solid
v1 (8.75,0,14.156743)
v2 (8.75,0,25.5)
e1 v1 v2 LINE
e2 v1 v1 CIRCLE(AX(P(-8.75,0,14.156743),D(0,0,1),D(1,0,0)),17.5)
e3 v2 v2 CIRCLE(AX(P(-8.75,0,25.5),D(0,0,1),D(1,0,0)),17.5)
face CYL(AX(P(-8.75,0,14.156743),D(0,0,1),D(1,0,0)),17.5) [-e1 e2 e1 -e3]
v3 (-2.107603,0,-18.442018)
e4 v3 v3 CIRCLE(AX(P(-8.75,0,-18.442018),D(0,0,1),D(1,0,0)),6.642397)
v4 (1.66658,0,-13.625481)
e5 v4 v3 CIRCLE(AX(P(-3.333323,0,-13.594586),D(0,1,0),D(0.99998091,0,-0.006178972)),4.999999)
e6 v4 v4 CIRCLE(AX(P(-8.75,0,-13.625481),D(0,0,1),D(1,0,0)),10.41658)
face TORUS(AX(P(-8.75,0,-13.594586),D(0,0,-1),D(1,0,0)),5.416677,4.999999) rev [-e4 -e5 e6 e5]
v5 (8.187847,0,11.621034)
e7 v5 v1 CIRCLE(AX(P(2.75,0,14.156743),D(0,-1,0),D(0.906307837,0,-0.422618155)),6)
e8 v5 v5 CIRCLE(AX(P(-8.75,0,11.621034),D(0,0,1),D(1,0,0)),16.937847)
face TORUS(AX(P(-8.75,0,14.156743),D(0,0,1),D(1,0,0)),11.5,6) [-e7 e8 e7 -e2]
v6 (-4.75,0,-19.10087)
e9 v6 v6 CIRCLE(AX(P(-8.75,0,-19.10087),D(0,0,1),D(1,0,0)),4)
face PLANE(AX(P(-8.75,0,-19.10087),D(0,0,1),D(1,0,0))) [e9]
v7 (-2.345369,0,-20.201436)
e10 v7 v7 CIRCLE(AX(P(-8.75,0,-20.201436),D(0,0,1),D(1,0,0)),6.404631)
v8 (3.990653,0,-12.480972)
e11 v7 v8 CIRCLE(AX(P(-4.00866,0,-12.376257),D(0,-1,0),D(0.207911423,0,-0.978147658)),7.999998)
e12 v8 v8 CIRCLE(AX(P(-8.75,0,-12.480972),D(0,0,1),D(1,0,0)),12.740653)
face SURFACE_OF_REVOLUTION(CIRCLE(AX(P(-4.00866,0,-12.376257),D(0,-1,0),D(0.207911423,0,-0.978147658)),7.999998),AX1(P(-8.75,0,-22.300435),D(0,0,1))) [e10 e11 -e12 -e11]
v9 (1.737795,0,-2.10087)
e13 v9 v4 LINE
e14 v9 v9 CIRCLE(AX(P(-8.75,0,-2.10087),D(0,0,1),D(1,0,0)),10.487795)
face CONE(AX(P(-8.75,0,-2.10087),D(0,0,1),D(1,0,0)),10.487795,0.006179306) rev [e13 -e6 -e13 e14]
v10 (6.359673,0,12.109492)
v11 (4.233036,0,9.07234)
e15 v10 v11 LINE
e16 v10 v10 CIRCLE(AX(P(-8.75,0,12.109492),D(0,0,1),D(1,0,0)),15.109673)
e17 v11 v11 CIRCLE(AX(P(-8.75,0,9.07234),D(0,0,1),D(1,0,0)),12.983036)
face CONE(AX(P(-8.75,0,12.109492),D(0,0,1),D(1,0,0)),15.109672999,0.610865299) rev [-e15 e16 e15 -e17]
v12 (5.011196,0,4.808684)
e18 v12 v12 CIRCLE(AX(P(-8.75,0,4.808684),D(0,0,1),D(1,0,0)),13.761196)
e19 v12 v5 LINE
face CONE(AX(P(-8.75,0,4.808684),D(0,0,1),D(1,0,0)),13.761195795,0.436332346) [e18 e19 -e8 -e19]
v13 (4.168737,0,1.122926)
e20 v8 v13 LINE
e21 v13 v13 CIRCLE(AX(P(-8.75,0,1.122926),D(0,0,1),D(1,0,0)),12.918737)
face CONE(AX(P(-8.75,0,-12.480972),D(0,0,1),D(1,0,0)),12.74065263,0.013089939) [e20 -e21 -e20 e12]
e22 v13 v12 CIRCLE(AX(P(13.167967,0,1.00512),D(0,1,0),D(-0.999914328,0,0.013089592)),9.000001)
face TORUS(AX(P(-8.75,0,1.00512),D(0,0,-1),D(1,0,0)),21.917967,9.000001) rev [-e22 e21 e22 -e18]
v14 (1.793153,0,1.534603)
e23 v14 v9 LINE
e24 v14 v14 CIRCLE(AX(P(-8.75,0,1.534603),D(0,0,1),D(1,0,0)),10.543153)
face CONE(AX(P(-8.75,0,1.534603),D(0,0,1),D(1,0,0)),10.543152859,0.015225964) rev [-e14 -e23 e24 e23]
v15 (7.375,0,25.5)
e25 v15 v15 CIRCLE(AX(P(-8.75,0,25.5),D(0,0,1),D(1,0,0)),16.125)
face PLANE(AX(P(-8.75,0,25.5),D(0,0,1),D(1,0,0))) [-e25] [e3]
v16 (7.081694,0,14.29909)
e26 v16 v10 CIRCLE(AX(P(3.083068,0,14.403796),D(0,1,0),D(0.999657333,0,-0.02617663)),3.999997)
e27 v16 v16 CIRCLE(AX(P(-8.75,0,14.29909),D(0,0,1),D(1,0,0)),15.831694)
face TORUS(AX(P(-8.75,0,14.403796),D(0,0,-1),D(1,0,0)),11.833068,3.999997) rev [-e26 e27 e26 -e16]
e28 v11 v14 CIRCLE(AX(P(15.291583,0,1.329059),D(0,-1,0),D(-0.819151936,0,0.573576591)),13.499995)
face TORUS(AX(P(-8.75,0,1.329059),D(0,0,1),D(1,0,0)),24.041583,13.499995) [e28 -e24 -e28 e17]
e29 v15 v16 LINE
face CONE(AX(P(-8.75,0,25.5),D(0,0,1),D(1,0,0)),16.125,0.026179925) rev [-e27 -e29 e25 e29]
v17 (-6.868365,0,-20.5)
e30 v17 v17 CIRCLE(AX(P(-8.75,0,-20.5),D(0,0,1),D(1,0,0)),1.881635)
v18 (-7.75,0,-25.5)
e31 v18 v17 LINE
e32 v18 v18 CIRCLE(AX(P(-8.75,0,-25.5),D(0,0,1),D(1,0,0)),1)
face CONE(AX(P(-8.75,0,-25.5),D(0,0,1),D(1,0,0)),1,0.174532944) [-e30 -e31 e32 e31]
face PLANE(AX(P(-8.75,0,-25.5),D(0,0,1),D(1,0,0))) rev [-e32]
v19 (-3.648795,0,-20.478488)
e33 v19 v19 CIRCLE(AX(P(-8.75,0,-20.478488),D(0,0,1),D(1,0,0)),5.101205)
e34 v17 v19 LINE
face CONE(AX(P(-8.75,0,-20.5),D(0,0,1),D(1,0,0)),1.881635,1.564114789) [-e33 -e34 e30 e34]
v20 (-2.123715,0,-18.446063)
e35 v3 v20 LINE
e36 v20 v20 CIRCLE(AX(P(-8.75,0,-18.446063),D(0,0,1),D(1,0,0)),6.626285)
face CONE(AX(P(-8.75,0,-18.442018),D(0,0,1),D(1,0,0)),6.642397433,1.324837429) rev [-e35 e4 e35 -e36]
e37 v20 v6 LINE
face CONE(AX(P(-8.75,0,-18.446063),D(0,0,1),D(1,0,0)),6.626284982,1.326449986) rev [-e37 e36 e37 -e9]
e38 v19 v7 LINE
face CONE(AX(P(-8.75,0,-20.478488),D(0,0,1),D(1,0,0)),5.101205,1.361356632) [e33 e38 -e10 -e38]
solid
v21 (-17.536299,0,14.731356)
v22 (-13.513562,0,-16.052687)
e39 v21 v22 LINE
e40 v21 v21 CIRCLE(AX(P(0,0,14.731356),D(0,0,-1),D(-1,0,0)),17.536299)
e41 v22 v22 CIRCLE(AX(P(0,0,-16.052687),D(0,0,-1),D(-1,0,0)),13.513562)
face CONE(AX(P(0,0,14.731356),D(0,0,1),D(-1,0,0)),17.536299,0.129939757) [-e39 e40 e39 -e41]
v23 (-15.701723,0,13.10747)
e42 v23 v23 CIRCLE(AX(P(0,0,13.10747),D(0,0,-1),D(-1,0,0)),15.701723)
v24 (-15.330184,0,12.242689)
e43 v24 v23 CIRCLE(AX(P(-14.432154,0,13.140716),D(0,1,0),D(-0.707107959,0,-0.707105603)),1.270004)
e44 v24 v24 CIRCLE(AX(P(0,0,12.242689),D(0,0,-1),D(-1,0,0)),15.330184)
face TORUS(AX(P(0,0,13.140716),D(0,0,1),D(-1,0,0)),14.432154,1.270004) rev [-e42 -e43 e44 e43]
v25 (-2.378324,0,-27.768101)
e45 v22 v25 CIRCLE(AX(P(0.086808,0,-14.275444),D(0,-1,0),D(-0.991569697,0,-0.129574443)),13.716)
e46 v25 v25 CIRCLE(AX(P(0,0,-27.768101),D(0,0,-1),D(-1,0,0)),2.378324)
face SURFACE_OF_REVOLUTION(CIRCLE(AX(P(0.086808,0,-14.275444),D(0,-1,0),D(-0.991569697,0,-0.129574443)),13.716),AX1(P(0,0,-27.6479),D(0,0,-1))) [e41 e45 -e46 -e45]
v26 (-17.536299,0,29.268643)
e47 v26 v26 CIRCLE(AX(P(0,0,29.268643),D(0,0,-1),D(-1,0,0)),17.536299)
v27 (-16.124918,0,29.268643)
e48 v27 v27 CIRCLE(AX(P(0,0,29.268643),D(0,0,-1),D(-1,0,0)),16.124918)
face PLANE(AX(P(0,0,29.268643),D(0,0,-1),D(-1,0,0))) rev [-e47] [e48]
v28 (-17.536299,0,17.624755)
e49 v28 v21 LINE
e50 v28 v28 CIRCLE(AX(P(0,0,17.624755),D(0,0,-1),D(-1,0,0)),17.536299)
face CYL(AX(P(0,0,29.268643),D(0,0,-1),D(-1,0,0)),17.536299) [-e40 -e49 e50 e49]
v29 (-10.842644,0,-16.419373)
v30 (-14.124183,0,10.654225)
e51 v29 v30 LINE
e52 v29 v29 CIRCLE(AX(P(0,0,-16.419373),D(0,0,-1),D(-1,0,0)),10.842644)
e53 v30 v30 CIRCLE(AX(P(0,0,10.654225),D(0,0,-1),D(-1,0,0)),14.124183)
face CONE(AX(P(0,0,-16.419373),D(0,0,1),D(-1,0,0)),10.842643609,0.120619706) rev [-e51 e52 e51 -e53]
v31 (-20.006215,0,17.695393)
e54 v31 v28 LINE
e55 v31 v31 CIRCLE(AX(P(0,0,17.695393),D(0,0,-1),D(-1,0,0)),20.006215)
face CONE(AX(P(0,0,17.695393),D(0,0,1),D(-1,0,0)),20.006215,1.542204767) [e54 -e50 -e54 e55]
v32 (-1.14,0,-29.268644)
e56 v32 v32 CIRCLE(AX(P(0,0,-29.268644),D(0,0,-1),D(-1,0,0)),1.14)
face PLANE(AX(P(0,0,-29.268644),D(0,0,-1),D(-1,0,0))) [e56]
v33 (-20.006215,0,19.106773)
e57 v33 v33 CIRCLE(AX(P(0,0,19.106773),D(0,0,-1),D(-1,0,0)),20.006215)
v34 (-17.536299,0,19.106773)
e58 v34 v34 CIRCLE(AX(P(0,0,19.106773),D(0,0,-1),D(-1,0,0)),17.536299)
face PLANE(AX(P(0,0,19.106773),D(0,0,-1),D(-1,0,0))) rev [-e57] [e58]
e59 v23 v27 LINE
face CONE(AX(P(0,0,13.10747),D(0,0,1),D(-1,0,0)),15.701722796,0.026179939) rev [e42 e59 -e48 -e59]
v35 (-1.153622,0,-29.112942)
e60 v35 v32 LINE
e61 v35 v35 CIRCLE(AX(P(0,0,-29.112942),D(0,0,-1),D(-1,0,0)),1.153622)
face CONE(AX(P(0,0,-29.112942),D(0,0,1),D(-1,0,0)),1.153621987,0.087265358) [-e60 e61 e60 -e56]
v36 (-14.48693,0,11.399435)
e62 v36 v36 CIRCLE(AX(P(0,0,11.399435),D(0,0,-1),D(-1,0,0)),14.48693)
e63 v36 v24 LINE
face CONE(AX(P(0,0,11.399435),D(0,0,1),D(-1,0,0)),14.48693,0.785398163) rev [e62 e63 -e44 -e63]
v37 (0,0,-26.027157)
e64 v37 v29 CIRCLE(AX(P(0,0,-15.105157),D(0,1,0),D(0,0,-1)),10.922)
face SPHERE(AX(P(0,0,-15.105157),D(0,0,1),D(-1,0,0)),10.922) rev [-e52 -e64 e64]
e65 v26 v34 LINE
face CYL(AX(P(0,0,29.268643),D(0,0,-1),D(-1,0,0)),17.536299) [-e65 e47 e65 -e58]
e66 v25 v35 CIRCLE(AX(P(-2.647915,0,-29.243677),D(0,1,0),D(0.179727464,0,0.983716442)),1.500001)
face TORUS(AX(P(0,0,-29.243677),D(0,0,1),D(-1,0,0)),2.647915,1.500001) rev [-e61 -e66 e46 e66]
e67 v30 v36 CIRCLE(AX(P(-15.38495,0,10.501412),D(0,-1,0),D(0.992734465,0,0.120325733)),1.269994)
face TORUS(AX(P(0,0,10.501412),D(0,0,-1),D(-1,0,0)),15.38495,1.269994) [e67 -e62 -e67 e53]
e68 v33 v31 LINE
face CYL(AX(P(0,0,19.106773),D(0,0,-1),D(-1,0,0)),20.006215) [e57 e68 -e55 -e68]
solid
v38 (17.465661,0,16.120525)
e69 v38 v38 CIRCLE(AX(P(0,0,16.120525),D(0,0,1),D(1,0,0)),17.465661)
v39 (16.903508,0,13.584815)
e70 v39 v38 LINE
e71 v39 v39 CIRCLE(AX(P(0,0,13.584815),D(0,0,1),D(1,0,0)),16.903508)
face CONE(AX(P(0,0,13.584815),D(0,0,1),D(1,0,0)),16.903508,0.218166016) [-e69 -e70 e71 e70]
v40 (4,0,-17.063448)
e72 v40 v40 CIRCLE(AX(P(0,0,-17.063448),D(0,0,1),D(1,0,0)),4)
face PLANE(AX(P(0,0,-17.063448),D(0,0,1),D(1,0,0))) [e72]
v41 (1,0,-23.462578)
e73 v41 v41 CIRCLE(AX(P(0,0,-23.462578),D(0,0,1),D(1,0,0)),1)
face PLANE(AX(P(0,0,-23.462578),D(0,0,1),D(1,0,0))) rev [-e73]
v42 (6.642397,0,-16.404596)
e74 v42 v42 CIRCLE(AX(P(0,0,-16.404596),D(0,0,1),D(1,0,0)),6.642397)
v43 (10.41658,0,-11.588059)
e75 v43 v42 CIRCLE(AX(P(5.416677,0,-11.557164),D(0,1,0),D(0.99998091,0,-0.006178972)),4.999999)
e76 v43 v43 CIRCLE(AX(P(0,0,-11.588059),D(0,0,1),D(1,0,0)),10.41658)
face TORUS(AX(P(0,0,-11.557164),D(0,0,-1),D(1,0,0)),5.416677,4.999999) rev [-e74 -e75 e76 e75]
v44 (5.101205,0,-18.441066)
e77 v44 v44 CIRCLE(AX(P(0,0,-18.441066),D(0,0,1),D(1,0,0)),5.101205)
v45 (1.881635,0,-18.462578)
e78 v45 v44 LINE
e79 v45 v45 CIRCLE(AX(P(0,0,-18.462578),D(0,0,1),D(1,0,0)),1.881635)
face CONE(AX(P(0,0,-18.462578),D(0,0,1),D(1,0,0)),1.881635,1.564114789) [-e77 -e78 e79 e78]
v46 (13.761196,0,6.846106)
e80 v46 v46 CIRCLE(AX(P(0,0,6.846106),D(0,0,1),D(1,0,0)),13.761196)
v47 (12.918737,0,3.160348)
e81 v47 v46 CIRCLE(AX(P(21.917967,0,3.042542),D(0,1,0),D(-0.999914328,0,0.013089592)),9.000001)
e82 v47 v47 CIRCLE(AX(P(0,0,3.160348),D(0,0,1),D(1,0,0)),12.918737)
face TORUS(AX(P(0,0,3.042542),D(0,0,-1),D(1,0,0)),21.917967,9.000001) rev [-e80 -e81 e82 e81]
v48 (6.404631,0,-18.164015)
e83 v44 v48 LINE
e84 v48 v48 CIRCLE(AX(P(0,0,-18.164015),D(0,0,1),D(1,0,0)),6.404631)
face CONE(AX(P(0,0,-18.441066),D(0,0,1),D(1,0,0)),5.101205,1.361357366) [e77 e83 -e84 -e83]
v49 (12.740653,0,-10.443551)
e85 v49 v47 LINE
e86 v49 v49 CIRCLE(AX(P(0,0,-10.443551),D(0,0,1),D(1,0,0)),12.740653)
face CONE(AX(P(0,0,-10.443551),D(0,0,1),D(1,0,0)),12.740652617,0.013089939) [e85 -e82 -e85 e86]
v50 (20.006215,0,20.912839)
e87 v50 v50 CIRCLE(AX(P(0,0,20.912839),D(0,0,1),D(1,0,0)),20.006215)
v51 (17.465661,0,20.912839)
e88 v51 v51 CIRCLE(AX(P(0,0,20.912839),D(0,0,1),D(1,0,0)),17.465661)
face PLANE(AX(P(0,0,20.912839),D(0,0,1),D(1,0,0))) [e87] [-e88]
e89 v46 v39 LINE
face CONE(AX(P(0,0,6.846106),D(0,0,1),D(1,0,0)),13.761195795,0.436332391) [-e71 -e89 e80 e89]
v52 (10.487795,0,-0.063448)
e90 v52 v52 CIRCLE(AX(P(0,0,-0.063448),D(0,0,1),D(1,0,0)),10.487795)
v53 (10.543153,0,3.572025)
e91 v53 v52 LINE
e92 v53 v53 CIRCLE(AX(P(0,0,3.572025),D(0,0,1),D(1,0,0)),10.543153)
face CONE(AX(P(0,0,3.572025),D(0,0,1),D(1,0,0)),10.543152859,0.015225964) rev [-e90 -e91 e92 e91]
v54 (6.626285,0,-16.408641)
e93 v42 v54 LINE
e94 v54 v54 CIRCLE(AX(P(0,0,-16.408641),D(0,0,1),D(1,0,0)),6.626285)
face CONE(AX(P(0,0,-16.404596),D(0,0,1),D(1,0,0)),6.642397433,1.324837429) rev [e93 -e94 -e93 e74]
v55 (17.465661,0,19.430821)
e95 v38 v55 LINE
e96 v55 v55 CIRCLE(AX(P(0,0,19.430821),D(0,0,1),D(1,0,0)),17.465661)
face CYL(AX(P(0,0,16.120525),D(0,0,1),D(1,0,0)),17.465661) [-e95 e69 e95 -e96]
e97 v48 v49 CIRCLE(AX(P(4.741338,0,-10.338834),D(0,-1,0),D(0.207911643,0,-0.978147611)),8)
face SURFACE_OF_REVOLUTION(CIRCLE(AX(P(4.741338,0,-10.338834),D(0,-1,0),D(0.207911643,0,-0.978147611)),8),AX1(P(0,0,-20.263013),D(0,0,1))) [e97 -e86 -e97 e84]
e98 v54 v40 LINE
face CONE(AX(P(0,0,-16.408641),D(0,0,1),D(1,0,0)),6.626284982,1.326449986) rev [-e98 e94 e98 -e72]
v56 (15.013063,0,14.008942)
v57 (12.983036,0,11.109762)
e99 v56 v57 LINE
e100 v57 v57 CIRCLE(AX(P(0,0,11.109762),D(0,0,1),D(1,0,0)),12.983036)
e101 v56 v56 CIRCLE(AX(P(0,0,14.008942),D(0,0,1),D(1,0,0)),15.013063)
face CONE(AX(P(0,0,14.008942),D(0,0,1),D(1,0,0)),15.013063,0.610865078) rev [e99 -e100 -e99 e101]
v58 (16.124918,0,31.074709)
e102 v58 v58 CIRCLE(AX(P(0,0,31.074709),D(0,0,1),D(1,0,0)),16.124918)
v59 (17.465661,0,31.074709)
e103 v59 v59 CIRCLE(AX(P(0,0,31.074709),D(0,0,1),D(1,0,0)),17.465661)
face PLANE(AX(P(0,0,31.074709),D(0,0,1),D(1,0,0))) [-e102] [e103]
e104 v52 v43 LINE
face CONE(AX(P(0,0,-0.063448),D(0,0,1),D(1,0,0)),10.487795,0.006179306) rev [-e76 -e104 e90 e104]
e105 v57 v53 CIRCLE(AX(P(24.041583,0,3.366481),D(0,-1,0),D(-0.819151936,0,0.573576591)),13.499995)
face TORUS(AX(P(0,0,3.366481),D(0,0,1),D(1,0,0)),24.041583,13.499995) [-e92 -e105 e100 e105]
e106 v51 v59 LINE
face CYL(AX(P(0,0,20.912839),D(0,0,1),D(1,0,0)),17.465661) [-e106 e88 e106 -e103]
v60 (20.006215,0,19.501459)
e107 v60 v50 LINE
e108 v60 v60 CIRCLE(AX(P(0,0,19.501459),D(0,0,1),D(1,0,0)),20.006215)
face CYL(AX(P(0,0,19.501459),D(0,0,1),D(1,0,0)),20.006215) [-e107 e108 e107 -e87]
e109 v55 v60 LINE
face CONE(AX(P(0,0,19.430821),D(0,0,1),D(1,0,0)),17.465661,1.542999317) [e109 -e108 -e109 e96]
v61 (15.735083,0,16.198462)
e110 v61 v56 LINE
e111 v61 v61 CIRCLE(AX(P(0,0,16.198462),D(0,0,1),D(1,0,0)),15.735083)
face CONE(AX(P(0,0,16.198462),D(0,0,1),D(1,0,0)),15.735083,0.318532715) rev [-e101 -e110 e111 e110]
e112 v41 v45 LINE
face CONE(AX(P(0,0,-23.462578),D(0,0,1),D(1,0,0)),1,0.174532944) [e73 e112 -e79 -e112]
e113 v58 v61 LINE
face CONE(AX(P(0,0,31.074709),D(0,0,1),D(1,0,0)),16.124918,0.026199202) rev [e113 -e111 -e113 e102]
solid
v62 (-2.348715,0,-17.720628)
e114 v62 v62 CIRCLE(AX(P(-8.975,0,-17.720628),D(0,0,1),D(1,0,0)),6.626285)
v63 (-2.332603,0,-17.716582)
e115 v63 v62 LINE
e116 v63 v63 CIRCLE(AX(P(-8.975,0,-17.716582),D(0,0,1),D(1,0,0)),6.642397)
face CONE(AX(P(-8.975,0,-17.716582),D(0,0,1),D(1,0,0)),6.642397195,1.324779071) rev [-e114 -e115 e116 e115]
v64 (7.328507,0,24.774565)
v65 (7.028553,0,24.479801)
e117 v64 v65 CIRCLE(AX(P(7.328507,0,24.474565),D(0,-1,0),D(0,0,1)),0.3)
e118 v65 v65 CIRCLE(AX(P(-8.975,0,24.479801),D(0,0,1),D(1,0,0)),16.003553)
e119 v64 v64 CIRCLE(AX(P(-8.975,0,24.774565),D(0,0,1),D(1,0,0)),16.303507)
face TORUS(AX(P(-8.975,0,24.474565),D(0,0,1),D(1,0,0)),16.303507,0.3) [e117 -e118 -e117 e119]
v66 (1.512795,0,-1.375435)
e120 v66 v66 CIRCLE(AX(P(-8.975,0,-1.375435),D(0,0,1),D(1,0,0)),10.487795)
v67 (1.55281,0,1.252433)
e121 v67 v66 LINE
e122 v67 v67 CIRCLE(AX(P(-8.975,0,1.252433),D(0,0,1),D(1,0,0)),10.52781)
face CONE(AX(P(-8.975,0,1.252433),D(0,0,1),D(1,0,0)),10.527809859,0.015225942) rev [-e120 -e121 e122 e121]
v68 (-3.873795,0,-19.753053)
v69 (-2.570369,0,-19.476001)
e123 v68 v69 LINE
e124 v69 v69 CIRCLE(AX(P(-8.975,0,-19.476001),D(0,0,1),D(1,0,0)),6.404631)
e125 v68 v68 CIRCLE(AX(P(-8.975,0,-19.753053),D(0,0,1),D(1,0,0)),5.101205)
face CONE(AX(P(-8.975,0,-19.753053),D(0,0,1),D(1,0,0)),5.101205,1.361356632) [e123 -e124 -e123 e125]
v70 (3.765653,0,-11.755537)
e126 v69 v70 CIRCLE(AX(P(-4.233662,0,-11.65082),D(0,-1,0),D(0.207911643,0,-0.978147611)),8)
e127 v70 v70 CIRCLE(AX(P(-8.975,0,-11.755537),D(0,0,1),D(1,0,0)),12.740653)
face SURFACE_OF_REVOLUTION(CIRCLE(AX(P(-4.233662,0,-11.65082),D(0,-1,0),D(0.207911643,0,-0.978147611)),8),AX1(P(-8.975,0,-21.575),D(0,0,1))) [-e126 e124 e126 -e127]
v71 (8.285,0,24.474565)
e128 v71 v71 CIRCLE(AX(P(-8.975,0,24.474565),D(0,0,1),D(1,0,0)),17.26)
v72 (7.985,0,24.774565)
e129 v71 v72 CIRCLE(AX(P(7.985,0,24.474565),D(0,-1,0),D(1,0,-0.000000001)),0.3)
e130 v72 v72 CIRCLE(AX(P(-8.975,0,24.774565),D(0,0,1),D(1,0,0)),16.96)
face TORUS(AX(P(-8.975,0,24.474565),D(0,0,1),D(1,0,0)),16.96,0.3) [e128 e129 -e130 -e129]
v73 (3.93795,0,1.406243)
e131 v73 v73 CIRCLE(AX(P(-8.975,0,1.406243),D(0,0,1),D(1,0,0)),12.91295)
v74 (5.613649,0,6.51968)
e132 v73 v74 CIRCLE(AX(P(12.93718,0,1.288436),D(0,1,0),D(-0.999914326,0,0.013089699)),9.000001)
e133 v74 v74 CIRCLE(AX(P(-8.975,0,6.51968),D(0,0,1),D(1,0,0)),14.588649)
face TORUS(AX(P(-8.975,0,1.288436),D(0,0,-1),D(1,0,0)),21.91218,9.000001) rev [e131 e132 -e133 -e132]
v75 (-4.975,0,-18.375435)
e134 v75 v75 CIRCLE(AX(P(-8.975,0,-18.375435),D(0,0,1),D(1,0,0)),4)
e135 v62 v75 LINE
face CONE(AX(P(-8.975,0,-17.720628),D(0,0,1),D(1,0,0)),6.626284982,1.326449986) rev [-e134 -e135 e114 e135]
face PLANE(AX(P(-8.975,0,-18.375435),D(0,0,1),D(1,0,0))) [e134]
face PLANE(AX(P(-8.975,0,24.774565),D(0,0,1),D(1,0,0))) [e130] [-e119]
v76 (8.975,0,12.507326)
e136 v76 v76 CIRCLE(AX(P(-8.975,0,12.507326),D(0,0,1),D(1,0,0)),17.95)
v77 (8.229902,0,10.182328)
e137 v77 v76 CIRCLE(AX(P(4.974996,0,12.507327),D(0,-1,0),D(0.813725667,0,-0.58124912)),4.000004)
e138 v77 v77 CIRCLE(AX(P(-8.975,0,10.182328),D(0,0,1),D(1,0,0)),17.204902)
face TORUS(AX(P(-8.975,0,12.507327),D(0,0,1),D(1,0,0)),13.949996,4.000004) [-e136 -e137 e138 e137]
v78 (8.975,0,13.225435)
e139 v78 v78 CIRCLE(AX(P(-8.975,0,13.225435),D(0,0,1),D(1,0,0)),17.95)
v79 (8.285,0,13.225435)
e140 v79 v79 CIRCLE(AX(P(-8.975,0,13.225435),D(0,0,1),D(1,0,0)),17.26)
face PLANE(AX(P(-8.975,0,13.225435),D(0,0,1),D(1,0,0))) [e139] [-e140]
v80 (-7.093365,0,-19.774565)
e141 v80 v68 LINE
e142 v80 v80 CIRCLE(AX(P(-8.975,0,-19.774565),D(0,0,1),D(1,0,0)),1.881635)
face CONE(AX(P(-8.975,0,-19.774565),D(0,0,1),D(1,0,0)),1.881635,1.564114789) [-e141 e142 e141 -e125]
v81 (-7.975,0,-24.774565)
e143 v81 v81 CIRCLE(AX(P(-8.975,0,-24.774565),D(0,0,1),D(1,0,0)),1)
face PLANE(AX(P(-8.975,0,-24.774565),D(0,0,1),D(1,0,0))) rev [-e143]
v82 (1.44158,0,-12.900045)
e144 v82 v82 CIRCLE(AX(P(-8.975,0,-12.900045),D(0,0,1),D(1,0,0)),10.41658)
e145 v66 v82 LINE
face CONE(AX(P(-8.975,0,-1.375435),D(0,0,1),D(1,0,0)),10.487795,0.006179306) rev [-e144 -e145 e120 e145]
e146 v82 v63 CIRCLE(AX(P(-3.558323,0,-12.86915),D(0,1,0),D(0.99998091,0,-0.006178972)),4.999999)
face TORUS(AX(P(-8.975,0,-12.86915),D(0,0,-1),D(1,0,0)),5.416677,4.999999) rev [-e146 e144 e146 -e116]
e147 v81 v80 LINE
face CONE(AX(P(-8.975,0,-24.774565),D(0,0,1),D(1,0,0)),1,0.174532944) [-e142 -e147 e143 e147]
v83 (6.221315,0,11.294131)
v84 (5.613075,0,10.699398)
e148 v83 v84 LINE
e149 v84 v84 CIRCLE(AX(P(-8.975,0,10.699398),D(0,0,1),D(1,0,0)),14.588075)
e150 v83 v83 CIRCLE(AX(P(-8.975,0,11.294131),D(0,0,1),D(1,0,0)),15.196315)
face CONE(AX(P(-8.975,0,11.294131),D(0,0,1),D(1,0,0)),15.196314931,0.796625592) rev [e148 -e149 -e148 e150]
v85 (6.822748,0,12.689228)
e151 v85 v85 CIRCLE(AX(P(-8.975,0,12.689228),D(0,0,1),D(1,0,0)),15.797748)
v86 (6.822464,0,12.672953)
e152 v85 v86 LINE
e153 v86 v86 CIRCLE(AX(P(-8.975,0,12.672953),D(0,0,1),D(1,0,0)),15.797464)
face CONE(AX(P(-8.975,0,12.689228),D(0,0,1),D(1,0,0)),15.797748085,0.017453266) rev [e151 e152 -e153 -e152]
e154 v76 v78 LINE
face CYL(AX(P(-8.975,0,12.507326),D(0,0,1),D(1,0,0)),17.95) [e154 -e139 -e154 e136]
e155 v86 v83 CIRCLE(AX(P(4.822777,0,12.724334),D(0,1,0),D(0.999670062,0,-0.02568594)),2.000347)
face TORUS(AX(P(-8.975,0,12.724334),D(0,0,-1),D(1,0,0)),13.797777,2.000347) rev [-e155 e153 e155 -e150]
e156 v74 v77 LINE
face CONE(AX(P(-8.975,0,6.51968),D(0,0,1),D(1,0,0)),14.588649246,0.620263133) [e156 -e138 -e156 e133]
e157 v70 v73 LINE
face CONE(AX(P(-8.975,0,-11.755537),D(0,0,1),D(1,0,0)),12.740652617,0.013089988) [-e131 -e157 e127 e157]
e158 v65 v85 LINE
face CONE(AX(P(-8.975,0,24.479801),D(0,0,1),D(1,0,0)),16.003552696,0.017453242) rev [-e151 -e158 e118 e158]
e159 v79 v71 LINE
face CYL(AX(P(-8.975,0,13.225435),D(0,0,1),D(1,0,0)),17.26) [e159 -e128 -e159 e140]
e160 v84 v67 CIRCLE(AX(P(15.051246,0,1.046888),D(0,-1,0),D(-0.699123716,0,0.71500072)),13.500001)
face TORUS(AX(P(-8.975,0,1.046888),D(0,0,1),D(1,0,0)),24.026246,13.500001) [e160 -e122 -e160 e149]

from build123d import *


# Not quite as in the source:
# - ends of sketch curves that miss each other by under 0.0002 mm in the source are joined


with BuildPart() as f1:
    # F0 (on Front) → F1 (revolve)
    with BuildSketch(Plane.XZ):
        with BuildLine():
            Line((8.285, 24.324565), (8.285, 24.325435))
            Line((8.285, 24.325435), (8.285, 24.474565))
            ThreePointArc((8.285, 24.474565), (8.1971320344, 24.6866970344), (7.985, 24.774565))
            Line((7.985, 24.774565), (7.328507, 24.774565))
            ThreePointArc((7.328507, 24.774565), (7.1182343218, 24.6885402341), (7.0285526964, 24.4798010053))
            Line((7.0285526964, 24.4798010053), (6.8227480853, 12.6892282603))
            Line((6.8227480853, 12.6892282603), (6.822464, 12.672953))
            ThreePointArc((6.822464, 12.672953), (6.6564245509, 11.9248810013), (6.2213149313, 11.2941310703))
            Line((6.2213149313, 11.2941310703), (5.613075, 10.699398))
            ThreePointArc((5.613075, 10.699398), (2.6482917301, 6.3776243642), (1.5528098591, 1.2524330021))
            Line((1.5528098591, 1.2524330021), (1.512795, -1.375435))
            Line((1.512795, -1.375435), (1.44158, -12.900045))
            ThreePointArc((1.44158, -12.900045), (0.3773285929, -15.9530813385), (-2.3326028047, -17.7165820889))
            Line((-2.3326028047, -17.7165820889), (-2.3487150182, -17.7206279268))
            Line((-2.3487150182, -17.7206279268), (-4.975, -18.375435))
            Line((-4.975, -18.375435), (-8.975, -18.375435))
            Line((-8.975, -18.375435), (-8.975, -24.774565))
            Line((-8.975, -24.774565), (-7.975, -24.774565))
            Line((-7.975, -24.774565), (-7.093365, -19.774565))
            Line((-7.093365, -19.774565), (-3.873795, -19.753053))
            Line((-3.873795, -19.753053), (-2.570369, -19.476001))
            ThreePointArc((-2.570369, -19.476001), (1.9504213735, -16.7259665821), (3.7656526174, -11.7555370081))
            Line((3.7656526174, -11.7555370081), (3.93795, 1.406243))
            ThreePointArc((3.93795, 1.406243), (4.384698548, 4.0911272277), (5.6136492463, 6.5196798241))
            Line((5.6136492463, 6.5196798241), (8.229902, 10.182328))
            ThreePointArc((8.229902, 10.182328), (8.7841735908, 11.2865899289), (8.975, 12.507326))
            Line((8.975, 12.507326), (8.975, 13.225435))
            Line((8.975, 13.225435), (8.285, 13.225435))
            Line((8.285, 13.225435), (8.285, 24.324565))
        make_face()
    revolve(axis=Axis((-8.975, 0, -21.575), (0, 0, 1)))


with BuildPart() as f3:
    # F2 (on Front) → F3 (revolve)
    with BuildSketch(Plane.XZ):
        with BuildLine():
            Line((8.75, 14.5), (8.75, 25.5))
            Line((8.75, 25.5), (7.375, 25.5))
            Line((7.375, 25.5), (7.081694, 14.29909))
            ThreePointArc((7.081694, 14.29909), (6.8818614226, 13.1511425249), (6.3596729993, 12.1094920005))
            Line((6.3596729993, 12.1094920005), (4.233036, 9.07234))
            ThreePointArc((4.233036, 9.07234), (2.4476875278, 5.4864875736), (1.7931528591, 1.5346030021))
            Line((1.7931528591, 1.5346030021), (1.737795, -2.10087))
            Line((1.737795, -2.10087), (1.66658, -13.625481))
            ThreePointArc((1.66658, -13.625481), (0.6023286685, -16.678517242), (-2.1076025671, -18.4420180288))
            Line((-2.1076025671, -18.4420180288), (-2.1237150182, -18.4460629268))
            Line((-2.1237150182, -18.4460629268), (-4.75, -19.10087))
            Line((-4.75, -19.10087), (-8.75, -19.10087))
            Line((-8.75, -19.10087), (-8.75, -25.5))
            Line((-8.75, -25.5), (-7.75, -25.5))
            Line((-7.75, -25.5), (-6.868365, -20.5))
            Line((-6.868365, -20.5), (-3.648795, -20.478488))
            Line((-3.648795, -20.478488), (-2.345369, -20.201436))
            ThreePointArc((-2.345369, -20.201436), (2.1754217566, -17.4514021153), (3.9906526305, -12.4809720083))
            Line((3.9906526305, -12.4809720083), (4.168737, 1.122926))
            ThreePointArc((4.168737, 1.122926), (4.3942393141, 3.0105426589), (5.0111957953, 4.8086840954))
            Line((5.0111957953, 4.8086840954), (8.187847, 11.621034))
            ThreePointArc((8.187847, 11.621034), (8.6077761114, 12.858105626), (8.75, 14.156743))
            Line((8.75, 14.156743), (8.75, 14.5))
        make_face()
    revolve(axis=Axis((-8.75, 0, -22.300435), (0, 0, 1)))


with BuildPart() as f5:
    # F4 (on Front) → F5 (revolve)
    with BuildSketch(Plane.XZ):
        with BuildLine():
            Line((0, -23.462578), (1, -23.462578))
            Line((1, -23.462578), (1.881635, -18.462578))
            Line((1.881635, -18.462578), (5.101205, -18.441066))
            Line((5.101205, -18.441066), (6.404631, -18.164015))
            ThreePointArc((6.404631, -18.164015), (10.9254213735, -15.4139805821), (12.7406526174, -10.4435510081))
            Line((12.7406526174, -10.4435510081), (12.918737, 3.160348))
            ThreePointArc((12.918737, 3.160348), (13.1442393141, 5.0479646589), (13.7611957953, 6.8461060954))
            Line((13.7611957953, 6.8461060954), (16.903508, 13.584815))
            Line((16.903508, 13.584815), (17.465661, 16.120525))
            Line((17.465661, 16.120525), (17.465661, 19.430821))
            Line((17.465661, 19.430821), (20.006215, 19.501459))
            Line((20.006215, 19.501459), (20.006215, 20.912839))
            Line((20.006215, 20.912839), (17.465661, 20.912839))
            Line((17.465661, 20.912839), (17.465661, 31.074709))
            Line((17.465661, 31.074709), (17.32473, 31.074709))
            Line((17.32473, 31.074709), (16.759971, 31.074709))
            Line((16.759971, 31.074709), (16.124918, 31.074709))
            Line((16.124918, 31.074709), (15.735083, 16.198462))
            Line((15.735083, 16.198462), (15.013063, 14.008942))
            Line((15.013063, 14.008942), (12.983036, 11.109762))
            ThreePointArc((12.983036, 11.109762), (11.1976875278, 7.5239095736), (10.5431528591, 3.5720250021))
            Line((10.5431528591, 3.5720250021), (10.487795, -0.063448))
            Line((10.487795, -0.063448), (10.41658, -11.588059))
            ThreePointArc((10.41658, -11.588059), (9.3523286685, -14.641095242), (6.6423974329, -16.4045960288))
            Line((6.6423974329, -16.4045960288), (6.6262849818, -16.4086409268))
            Line((6.6262849818, -16.4086409268), (4, -17.063448))
            Line((4, -17.063448), (0, -17.063448))
            Line((0, -17.063448), (0, -23.462578))
        make_face()
    revolve(axis=Axis((0, 0, -20.263013), (0, 0, 1)))


with BuildPart() as f7:
    # F6 (on Front) → F7 (revolve)
    with BuildSketch(Plane.XZ):
        with BuildLine():
            Line((-14.48693, 11.399435), (-14.643245, 11.55575))
            Line((-14.643245, 11.55575), (-15.330184, 12.242689))
            ThreePointArc((-15.330184, 12.242689), (-15.5990227835, 12.6393901782), (-15.7017227956, 13.1074700054))
            Line((-15.7017227956, 13.1074700054), (-16.124918, 29.268643))
            Line((-16.124918, 29.268643), (-16.830609, 29.268643))
            Line((-16.830609, 29.268643), (-17.32473, 29.268643))
            Line((-17.32473, 29.268643), (-17.536299, 29.268643))
            Line((-17.536299, 29.268643), (-17.536299, 19.106773))
            Line((-17.536299, 19.106773), (-17.536299, 17.624755))
            Line((-17.536299, 17.624755), (-17.536299, 14.731356))
            Line((-17.536299, 14.731356), (-13.513562, -16.052687))
            ThreePointArc((-13.513562, -16.052687), (-9.8549129967, -23.7248270288), (-2.3783239168, -27.7681005447))
            ThreePointArc((-2.3783239168, -27.7681005447), (-1.5388742478, -28.2337102441), (-1.1536219867, -29.1129419988))
            Line((-1.1536219867, -29.1129419988), (-1.14, -29.268644))
            Line((-1.14, -29.268644), (0, -29.268644))
            Line((0, -29.268644), (0, -28.319565))
            Line((0, -28.319565), (0, -26.027157))
            ThreePointArc((0, -26.027157), (-7.2434873288, -23.2796279503), (-10.8426436089, -16.4193729526))
            Line((-10.8426436089, -16.4193729526), (-14.124183, 10.654225))
            ThreePointArc((-14.124183, 10.654225), (-14.2430547112, 11.0572540598), (-14.48693, 11.399435))
        make_face()
        Polygon((-17.536299, 17.624755), (-17.536299, 19.106773), (-20.006215, 19.106773), (-20.006215, 17.695393), align=None)
    revolve(axis=Axis((0, 0, -27.6479005), (0, 0, -1)))


solid = Compound([f1.part, f3.part, f5.part, f7.part])
